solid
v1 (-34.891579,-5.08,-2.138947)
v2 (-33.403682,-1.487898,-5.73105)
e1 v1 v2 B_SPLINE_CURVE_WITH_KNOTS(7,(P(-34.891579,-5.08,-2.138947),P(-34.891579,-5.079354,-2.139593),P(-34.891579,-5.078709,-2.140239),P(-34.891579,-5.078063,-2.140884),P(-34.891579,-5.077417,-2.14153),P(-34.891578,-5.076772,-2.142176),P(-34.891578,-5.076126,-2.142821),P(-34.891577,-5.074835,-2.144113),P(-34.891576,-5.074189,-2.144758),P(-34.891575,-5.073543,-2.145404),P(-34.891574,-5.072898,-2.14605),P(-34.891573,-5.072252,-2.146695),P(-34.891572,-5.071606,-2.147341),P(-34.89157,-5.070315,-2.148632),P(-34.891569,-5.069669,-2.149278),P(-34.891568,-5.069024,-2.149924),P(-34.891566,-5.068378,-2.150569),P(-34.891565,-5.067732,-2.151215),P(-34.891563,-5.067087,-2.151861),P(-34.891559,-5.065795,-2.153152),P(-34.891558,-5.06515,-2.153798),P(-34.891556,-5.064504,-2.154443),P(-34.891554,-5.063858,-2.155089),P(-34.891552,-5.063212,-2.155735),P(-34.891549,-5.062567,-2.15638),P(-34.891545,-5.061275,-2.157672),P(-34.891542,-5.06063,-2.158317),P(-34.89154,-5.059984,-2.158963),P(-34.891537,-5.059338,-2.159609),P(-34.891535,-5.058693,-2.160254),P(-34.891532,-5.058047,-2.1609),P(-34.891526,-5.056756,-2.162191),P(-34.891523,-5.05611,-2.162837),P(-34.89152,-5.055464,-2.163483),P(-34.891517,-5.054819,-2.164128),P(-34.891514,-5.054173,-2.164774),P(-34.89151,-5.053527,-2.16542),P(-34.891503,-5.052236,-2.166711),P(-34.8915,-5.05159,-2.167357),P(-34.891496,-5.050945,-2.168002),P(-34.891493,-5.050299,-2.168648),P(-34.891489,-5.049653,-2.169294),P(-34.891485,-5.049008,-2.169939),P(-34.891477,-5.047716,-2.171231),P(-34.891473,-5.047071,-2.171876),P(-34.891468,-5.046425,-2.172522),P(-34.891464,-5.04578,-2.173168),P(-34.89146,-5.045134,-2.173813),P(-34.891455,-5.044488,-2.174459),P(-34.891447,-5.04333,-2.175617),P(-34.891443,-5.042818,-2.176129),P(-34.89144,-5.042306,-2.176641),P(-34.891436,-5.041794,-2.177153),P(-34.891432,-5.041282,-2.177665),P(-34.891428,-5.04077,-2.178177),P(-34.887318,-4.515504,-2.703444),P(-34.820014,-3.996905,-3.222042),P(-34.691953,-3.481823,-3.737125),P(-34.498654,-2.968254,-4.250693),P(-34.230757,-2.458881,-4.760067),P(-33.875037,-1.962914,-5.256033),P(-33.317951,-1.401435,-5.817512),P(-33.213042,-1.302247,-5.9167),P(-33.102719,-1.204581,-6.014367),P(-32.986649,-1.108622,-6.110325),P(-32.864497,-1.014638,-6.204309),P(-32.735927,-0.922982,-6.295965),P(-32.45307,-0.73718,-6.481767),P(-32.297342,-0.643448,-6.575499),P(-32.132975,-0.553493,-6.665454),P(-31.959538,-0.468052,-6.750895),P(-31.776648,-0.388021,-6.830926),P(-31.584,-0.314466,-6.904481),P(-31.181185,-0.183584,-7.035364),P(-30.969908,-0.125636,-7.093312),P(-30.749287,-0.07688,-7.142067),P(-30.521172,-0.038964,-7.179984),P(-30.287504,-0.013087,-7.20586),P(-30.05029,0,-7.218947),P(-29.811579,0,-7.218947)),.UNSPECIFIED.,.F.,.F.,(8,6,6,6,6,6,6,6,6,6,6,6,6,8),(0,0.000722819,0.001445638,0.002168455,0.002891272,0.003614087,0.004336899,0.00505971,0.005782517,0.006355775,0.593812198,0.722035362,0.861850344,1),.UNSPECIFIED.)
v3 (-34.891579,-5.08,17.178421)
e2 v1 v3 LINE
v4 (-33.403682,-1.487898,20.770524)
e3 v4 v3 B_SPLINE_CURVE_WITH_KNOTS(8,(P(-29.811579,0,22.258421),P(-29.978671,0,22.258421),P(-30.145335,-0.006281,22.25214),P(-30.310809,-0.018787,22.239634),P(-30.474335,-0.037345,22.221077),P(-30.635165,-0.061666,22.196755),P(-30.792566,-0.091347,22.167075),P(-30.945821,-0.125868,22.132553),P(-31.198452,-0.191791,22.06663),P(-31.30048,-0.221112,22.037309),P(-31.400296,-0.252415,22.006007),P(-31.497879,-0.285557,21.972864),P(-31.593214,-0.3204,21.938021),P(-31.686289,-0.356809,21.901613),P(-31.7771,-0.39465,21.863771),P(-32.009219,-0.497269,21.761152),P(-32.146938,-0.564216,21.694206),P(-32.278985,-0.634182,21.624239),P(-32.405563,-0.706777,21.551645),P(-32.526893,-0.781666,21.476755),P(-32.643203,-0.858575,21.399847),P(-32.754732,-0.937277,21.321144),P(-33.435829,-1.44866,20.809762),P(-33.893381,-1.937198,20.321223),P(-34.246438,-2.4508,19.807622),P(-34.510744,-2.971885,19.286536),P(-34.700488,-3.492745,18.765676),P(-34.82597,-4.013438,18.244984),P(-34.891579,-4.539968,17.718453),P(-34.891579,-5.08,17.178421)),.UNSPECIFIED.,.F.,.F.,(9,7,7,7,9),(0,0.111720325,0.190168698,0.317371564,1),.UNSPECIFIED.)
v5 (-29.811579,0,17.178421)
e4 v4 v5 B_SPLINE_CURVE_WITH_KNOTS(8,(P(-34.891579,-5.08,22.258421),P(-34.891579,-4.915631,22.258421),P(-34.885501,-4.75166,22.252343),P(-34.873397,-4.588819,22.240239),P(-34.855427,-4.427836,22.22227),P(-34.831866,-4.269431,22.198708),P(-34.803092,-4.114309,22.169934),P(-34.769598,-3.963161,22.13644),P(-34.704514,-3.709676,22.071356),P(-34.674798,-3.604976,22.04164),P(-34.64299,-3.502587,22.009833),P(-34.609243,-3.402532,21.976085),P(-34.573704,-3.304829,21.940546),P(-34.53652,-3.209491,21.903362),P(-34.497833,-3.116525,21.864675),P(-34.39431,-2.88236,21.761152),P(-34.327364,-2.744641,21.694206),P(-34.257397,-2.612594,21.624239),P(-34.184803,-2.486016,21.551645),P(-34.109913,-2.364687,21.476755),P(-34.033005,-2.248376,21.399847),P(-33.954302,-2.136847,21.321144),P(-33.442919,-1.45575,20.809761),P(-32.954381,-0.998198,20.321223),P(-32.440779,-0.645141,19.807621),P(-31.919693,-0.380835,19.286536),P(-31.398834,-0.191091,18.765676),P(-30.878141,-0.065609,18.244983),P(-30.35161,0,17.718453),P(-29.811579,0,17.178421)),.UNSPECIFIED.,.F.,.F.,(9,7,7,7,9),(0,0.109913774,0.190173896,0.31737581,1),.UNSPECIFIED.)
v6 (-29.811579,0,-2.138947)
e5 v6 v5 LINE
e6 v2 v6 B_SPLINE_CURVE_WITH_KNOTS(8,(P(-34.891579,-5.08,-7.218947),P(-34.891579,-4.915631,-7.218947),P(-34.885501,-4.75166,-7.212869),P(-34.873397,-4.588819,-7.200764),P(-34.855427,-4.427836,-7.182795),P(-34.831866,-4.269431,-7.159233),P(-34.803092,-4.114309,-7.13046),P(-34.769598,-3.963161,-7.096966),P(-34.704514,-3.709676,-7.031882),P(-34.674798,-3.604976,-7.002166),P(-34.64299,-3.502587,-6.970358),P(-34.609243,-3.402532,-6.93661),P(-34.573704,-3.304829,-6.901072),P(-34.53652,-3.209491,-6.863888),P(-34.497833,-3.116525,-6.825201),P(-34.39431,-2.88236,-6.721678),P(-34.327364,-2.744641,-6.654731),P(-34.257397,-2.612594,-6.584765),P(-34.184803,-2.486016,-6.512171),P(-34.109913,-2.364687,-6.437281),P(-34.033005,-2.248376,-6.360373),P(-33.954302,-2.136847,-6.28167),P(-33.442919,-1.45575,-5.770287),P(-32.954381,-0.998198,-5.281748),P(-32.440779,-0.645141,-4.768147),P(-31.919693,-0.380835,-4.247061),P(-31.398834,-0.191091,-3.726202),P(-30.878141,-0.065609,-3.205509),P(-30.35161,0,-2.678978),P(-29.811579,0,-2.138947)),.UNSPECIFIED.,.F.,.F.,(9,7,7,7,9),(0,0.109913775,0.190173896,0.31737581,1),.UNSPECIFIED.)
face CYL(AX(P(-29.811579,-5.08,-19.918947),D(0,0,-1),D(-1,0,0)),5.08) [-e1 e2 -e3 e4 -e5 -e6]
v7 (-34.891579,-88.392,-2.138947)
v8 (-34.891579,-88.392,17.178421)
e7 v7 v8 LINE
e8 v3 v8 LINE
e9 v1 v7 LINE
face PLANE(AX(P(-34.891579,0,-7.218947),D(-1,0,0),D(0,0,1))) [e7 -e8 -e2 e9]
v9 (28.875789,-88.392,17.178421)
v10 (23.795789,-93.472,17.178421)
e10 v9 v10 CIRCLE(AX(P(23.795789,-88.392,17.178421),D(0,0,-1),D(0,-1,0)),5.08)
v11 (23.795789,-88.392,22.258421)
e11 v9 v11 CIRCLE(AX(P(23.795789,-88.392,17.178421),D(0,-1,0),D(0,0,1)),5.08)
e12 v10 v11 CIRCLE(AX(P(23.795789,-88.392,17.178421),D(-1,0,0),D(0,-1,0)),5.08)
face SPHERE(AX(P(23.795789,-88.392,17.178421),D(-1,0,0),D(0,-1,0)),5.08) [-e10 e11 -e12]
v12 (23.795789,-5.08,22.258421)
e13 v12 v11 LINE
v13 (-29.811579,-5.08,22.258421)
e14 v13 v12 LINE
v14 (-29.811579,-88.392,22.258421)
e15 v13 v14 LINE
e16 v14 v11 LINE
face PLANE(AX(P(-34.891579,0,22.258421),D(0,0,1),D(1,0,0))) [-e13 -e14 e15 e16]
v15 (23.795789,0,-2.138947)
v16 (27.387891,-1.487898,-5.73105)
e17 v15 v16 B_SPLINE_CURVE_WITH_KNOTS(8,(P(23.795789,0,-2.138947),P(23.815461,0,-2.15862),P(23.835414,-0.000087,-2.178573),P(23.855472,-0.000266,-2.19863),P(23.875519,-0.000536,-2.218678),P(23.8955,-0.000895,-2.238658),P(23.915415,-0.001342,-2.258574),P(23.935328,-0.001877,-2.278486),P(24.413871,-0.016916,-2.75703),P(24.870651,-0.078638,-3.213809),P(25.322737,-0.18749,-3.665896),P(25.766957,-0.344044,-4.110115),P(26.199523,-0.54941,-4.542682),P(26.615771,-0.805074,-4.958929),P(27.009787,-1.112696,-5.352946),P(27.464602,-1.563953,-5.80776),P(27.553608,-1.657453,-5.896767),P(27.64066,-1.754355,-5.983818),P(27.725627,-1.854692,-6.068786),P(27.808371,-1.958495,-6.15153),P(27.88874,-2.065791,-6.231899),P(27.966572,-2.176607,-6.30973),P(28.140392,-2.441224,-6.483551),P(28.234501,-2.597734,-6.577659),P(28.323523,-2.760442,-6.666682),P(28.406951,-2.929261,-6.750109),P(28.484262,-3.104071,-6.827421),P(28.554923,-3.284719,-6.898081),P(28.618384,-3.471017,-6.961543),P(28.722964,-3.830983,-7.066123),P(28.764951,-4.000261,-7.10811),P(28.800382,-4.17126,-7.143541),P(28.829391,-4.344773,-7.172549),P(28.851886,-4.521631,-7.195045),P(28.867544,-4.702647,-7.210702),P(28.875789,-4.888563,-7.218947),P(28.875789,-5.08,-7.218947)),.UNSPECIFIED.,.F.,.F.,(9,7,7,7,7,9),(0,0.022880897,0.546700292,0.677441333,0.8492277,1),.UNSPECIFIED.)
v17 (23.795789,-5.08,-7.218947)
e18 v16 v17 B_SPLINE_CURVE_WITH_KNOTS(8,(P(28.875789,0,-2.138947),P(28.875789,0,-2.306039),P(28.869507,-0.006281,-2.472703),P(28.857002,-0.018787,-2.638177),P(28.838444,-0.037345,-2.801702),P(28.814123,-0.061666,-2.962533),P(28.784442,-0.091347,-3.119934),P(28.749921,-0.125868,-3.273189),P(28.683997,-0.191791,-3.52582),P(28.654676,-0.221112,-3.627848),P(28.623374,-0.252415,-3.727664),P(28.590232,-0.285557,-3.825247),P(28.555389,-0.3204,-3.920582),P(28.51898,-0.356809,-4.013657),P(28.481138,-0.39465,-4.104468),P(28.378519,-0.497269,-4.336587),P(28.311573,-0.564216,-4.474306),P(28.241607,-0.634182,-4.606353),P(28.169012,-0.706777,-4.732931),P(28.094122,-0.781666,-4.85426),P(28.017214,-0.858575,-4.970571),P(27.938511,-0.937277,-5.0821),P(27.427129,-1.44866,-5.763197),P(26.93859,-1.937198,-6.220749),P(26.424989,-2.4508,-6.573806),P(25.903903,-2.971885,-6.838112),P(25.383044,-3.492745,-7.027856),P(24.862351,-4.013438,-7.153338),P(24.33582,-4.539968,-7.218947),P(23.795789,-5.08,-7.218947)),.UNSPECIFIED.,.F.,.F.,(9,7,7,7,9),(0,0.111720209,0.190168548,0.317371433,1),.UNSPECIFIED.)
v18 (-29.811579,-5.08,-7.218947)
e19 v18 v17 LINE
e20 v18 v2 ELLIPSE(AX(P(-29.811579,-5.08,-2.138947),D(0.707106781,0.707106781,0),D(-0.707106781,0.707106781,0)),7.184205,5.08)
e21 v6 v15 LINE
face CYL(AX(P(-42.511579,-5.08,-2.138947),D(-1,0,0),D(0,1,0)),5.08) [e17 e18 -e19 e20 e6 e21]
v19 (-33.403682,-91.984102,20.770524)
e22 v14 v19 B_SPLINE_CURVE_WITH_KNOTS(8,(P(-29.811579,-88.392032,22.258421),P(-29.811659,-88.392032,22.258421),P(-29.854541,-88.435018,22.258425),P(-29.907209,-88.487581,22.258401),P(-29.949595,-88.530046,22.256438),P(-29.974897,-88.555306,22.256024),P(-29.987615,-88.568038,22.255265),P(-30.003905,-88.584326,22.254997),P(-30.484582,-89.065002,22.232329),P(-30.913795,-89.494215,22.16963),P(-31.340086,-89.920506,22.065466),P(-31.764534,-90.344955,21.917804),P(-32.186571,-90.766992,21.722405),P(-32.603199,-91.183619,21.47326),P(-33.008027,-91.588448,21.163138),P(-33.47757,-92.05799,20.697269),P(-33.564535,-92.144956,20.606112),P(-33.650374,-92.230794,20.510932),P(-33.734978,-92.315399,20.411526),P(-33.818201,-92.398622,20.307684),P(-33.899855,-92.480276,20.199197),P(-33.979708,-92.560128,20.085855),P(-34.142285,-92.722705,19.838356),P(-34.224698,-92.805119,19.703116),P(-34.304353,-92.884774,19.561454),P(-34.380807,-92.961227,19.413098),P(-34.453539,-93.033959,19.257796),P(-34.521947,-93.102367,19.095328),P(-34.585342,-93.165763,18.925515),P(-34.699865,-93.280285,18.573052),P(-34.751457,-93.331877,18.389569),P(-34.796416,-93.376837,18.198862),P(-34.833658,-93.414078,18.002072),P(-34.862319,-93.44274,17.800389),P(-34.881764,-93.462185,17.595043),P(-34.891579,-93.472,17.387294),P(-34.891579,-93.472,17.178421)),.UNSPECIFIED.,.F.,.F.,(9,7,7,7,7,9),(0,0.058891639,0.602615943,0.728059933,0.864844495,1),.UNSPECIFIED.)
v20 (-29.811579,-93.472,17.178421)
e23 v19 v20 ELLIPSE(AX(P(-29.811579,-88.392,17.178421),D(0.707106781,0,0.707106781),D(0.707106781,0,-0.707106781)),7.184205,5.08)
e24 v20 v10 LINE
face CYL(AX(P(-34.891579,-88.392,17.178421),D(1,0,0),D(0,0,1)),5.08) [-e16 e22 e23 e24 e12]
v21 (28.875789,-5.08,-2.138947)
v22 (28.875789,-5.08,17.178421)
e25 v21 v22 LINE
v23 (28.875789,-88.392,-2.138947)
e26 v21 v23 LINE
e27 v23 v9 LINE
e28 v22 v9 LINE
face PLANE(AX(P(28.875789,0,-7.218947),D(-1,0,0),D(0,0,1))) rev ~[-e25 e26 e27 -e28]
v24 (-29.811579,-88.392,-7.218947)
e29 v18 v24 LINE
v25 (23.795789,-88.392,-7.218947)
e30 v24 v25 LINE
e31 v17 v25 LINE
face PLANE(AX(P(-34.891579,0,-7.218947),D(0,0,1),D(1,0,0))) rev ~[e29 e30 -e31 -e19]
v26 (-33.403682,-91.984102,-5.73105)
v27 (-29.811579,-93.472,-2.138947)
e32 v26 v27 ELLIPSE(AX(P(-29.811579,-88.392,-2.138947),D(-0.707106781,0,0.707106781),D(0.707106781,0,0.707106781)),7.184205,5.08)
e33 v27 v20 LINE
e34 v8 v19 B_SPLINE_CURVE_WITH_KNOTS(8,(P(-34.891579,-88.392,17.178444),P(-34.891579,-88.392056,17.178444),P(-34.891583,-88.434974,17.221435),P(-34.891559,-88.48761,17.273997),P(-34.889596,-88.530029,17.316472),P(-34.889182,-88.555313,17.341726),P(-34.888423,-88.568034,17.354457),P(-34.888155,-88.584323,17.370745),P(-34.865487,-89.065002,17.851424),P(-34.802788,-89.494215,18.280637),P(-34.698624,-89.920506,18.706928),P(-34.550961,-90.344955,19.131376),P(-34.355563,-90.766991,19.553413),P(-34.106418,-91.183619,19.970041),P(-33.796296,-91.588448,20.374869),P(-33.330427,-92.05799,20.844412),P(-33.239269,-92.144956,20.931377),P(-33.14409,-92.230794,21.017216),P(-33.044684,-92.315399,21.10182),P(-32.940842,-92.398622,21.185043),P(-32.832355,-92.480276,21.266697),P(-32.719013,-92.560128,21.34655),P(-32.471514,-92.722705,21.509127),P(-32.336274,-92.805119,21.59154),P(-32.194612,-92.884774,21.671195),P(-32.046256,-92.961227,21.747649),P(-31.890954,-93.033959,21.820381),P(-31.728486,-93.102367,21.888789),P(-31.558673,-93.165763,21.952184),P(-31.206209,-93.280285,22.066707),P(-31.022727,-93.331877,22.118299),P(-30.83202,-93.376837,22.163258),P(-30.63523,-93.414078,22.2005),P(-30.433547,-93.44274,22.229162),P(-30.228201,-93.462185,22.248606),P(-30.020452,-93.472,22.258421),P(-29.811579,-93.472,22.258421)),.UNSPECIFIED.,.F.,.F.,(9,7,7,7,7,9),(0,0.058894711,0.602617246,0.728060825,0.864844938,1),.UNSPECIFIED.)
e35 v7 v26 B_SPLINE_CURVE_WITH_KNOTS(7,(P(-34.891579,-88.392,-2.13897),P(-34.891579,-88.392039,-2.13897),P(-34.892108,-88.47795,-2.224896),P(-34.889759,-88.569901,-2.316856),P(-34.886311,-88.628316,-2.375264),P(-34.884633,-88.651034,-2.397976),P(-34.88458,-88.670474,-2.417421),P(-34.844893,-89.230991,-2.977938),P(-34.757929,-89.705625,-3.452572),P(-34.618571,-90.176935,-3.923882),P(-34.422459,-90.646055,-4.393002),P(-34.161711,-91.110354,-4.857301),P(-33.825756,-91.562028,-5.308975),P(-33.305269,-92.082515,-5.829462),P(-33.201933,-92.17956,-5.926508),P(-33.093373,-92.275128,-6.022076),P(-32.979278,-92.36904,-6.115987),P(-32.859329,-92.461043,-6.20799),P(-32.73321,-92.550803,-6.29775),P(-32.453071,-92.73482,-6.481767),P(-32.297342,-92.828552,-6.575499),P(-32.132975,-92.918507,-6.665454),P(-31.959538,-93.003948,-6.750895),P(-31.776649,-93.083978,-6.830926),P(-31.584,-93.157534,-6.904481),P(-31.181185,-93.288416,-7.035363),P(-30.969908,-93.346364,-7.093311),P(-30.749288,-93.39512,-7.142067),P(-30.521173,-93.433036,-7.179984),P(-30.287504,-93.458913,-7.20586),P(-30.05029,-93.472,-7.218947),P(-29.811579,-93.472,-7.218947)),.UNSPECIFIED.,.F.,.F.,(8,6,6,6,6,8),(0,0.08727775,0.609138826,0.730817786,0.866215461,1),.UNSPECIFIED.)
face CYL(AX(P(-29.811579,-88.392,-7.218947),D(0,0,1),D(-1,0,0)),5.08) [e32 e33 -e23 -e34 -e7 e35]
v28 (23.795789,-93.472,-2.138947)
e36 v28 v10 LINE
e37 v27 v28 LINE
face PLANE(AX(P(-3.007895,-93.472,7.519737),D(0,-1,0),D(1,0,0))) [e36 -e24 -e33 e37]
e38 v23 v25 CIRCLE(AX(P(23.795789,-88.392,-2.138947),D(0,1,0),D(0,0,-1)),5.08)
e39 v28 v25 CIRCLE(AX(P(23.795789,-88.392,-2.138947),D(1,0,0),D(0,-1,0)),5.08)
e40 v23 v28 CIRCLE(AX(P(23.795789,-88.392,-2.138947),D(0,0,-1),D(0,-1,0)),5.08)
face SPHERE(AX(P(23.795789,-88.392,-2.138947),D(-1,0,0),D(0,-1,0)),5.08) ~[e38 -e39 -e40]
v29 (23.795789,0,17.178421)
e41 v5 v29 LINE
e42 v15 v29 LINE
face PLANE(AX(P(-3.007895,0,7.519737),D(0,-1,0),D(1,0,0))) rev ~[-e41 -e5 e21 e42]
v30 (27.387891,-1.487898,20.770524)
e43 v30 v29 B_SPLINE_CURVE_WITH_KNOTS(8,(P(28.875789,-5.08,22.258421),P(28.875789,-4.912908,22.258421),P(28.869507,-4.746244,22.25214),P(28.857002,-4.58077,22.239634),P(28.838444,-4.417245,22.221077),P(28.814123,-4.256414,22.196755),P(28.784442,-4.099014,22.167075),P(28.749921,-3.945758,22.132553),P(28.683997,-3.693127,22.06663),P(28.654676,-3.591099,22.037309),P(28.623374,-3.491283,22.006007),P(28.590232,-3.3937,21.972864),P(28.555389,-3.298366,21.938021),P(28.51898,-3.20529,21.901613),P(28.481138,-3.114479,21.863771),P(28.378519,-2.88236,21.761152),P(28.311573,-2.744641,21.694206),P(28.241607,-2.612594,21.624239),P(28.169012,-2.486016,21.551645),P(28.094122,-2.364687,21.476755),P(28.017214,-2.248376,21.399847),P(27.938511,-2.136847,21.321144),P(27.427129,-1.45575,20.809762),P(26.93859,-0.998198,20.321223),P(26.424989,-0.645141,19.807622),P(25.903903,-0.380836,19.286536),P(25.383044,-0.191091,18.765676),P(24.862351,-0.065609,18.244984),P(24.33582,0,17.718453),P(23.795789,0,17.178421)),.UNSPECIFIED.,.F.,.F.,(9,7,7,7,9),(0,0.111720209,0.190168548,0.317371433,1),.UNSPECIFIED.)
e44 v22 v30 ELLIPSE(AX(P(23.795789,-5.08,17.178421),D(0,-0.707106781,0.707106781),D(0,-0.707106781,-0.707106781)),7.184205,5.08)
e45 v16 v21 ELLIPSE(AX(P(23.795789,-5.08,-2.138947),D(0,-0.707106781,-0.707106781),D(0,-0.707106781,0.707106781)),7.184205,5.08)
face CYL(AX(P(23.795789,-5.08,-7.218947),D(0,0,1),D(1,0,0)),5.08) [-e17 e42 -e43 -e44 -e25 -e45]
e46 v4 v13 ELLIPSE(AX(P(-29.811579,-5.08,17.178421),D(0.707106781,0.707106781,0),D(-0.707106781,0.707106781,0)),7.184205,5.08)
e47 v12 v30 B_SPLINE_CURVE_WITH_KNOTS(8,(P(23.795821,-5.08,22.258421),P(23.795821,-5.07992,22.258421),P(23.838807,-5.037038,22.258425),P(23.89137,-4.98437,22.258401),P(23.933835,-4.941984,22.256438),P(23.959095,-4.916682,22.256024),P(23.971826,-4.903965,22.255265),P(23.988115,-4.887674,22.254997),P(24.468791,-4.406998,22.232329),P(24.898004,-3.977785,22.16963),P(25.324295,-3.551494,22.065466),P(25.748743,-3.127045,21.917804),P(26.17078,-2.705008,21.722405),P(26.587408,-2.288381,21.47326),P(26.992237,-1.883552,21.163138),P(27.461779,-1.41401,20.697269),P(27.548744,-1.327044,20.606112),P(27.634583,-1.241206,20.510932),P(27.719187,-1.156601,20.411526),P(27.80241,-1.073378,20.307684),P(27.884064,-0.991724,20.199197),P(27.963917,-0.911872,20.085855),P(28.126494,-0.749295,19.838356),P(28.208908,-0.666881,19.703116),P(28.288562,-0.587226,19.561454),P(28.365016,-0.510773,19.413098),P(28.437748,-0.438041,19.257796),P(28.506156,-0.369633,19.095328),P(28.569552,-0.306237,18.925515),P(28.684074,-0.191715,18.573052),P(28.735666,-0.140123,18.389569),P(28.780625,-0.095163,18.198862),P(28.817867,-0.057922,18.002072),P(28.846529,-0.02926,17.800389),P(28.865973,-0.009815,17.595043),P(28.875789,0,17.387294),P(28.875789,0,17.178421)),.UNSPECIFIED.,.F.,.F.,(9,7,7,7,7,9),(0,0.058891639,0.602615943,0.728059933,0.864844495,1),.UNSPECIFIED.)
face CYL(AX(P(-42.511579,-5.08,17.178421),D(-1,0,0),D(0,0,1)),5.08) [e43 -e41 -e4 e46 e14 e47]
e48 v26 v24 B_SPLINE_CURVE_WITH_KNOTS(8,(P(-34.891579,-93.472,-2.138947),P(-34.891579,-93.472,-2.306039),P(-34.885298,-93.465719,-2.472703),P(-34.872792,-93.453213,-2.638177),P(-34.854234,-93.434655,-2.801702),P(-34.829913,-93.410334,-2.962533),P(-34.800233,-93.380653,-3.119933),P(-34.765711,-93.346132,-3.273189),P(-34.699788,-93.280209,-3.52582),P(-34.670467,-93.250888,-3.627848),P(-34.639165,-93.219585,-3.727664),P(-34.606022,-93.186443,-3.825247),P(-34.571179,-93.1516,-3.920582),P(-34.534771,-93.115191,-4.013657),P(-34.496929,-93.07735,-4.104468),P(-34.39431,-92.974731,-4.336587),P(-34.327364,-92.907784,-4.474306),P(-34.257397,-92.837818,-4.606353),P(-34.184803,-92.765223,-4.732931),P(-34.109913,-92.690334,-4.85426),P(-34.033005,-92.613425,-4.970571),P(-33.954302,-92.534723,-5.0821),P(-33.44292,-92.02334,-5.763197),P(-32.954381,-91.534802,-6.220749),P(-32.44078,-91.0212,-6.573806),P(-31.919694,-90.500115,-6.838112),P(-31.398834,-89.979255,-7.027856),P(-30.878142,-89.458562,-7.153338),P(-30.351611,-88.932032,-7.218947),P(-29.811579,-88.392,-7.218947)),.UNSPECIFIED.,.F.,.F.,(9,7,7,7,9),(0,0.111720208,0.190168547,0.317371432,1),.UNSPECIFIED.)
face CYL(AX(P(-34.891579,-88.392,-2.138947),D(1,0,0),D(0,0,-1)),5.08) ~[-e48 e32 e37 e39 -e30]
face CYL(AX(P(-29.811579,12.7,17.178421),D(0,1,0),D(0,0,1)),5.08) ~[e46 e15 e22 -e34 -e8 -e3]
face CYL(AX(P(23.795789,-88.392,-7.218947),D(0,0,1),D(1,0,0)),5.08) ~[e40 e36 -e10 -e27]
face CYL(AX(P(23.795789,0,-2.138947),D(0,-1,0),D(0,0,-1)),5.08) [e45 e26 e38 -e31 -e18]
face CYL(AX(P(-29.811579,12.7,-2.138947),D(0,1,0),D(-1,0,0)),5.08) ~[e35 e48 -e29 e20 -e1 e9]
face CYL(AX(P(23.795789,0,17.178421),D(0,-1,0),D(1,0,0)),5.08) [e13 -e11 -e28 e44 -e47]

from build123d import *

# Parameters (mm, degrees)
F0_W        = 63.7673679739
F0_H        = 29.4773685746
F1_DEPTH    = 93.472
F2_R        = 5.08
F3_T1_DEPTH = 113.792
F3_T3_DEPTH = 54.8773685746
F4_T1_DEPTH = 79.007367974


# Not quite as in the source:
# - a fillet or chamfer that OpenCascade refuses, or shapes differently, is made with other operations: its cross-section is extruded or revolved along the edge and cut away or added
# - the program builds the solid bodies; features that only make, move or delete a surface that nothing else refers to are left out


with BuildPart() as f1:
    # F0 (on Front) → F1 (new body)
    with BuildSketch(Plane.XZ):
        with Locations((-3.0078953132, 7.5197371189)):
            Rectangle(F0_W, F0_H)
    extrude(amount=F1_DEPTH)

    # F2
    f2_edges = [f1.edges().sort_by_distance(p)[0] for p in [
        (-3.007895, -93.472, 22.258421),
        (-34.891579, -93.472, 7.519737),
        (-3.007895, -93.472, -7.218947),
        (28.875789, -93.472, 7.519737),
        (28.875789, -46.736, -7.218947),
        (28.875789, -46.736, 22.258421),
        (28.875789, 0, 7.519737),
    ]]
    fillet(f2_edges, radius=F2_R)

    # F3: fillet of radius 5.08 on 4 edges, made by hand

    # F3_s2 → F3_t1 (cut)
    with BuildSketch(Plane.XZ.offset(-12.7)):
        with BuildLine():
            ThreePointArc((-29.8115793002, 22.2584214061), (-33.4036817486, 20.7705238546), (-34.8915793002, 17.1784214061))
            Line((-34.8915793002, 17.1784214061), (-34.8915793002, 22.2584214061))
            Line((-34.8915793002, 22.2584214061), (-29.8115793002, 22.2584214061))
        make_face()
        with BuildLine():
            ThreePointArc((-34.8915793002, -2.1389471684), (-33.4036817486, -5.7310496169), (-29.8115793002, -7.2189471684))
            Line((-29.8115793002, -7.2189471684), (-34.8915793002, -7.2189471684))
            Line((-34.8915793002, -7.2189471684), (-34.8915793002, -2.1389471684))
        make_face()
    extrude(amount=F3_T1_DEPTH, mode=Mode.SUBTRACT)

    # F3_s4 → F3_t3 (cut)
    with BuildSketch(Plane.XY.offset(-19.9189471684)):
        with BuildLine():
            ThreePointArc((-34.8915793002, -5.08), (-33.4036817486, -1.4878975516), (-29.8115793002, 0))
            Line((-29.8115793002, 0), (-34.8915793002, 0))
            Line((-34.8915793002, 0), (-34.8915793002, -5.08))
        make_face()
    extrude(amount=F3_T3_DEPTH, mode=Mode.SUBTRACT)

    # F4: fillet of radius 5.08 on 4 edges, made by hand

    # F4_s2 → F4_t1 (cut)
    with BuildSketch(Plane.YZ.offset(-42.5115793002)):
        with BuildLine():
            ThreePointArc((0, -2.1389471684), (-1.4878975516, -5.7310496169), (-5.08, -7.2189471684))
            Line((-5.08, -7.2189471684), (0, -7.2189471684))
            Line((0, -7.2189471684), (0, -2.1389471684))
        make_face()
        with BuildLine():
            ThreePointArc((-5.08, 22.2584214061), (-1.4878975516, 20.7705238546), (0, 17.1784214061))
            Line((0, 17.1784214061), (0, 22.2584214061))
            Line((0, 22.2584214061), (-5.08, 22.2584214061))
        make_face()
    extrude(amount=F4_T1_DEPTH, mode=Mode.SUBTRACT)


solid = f1.part
